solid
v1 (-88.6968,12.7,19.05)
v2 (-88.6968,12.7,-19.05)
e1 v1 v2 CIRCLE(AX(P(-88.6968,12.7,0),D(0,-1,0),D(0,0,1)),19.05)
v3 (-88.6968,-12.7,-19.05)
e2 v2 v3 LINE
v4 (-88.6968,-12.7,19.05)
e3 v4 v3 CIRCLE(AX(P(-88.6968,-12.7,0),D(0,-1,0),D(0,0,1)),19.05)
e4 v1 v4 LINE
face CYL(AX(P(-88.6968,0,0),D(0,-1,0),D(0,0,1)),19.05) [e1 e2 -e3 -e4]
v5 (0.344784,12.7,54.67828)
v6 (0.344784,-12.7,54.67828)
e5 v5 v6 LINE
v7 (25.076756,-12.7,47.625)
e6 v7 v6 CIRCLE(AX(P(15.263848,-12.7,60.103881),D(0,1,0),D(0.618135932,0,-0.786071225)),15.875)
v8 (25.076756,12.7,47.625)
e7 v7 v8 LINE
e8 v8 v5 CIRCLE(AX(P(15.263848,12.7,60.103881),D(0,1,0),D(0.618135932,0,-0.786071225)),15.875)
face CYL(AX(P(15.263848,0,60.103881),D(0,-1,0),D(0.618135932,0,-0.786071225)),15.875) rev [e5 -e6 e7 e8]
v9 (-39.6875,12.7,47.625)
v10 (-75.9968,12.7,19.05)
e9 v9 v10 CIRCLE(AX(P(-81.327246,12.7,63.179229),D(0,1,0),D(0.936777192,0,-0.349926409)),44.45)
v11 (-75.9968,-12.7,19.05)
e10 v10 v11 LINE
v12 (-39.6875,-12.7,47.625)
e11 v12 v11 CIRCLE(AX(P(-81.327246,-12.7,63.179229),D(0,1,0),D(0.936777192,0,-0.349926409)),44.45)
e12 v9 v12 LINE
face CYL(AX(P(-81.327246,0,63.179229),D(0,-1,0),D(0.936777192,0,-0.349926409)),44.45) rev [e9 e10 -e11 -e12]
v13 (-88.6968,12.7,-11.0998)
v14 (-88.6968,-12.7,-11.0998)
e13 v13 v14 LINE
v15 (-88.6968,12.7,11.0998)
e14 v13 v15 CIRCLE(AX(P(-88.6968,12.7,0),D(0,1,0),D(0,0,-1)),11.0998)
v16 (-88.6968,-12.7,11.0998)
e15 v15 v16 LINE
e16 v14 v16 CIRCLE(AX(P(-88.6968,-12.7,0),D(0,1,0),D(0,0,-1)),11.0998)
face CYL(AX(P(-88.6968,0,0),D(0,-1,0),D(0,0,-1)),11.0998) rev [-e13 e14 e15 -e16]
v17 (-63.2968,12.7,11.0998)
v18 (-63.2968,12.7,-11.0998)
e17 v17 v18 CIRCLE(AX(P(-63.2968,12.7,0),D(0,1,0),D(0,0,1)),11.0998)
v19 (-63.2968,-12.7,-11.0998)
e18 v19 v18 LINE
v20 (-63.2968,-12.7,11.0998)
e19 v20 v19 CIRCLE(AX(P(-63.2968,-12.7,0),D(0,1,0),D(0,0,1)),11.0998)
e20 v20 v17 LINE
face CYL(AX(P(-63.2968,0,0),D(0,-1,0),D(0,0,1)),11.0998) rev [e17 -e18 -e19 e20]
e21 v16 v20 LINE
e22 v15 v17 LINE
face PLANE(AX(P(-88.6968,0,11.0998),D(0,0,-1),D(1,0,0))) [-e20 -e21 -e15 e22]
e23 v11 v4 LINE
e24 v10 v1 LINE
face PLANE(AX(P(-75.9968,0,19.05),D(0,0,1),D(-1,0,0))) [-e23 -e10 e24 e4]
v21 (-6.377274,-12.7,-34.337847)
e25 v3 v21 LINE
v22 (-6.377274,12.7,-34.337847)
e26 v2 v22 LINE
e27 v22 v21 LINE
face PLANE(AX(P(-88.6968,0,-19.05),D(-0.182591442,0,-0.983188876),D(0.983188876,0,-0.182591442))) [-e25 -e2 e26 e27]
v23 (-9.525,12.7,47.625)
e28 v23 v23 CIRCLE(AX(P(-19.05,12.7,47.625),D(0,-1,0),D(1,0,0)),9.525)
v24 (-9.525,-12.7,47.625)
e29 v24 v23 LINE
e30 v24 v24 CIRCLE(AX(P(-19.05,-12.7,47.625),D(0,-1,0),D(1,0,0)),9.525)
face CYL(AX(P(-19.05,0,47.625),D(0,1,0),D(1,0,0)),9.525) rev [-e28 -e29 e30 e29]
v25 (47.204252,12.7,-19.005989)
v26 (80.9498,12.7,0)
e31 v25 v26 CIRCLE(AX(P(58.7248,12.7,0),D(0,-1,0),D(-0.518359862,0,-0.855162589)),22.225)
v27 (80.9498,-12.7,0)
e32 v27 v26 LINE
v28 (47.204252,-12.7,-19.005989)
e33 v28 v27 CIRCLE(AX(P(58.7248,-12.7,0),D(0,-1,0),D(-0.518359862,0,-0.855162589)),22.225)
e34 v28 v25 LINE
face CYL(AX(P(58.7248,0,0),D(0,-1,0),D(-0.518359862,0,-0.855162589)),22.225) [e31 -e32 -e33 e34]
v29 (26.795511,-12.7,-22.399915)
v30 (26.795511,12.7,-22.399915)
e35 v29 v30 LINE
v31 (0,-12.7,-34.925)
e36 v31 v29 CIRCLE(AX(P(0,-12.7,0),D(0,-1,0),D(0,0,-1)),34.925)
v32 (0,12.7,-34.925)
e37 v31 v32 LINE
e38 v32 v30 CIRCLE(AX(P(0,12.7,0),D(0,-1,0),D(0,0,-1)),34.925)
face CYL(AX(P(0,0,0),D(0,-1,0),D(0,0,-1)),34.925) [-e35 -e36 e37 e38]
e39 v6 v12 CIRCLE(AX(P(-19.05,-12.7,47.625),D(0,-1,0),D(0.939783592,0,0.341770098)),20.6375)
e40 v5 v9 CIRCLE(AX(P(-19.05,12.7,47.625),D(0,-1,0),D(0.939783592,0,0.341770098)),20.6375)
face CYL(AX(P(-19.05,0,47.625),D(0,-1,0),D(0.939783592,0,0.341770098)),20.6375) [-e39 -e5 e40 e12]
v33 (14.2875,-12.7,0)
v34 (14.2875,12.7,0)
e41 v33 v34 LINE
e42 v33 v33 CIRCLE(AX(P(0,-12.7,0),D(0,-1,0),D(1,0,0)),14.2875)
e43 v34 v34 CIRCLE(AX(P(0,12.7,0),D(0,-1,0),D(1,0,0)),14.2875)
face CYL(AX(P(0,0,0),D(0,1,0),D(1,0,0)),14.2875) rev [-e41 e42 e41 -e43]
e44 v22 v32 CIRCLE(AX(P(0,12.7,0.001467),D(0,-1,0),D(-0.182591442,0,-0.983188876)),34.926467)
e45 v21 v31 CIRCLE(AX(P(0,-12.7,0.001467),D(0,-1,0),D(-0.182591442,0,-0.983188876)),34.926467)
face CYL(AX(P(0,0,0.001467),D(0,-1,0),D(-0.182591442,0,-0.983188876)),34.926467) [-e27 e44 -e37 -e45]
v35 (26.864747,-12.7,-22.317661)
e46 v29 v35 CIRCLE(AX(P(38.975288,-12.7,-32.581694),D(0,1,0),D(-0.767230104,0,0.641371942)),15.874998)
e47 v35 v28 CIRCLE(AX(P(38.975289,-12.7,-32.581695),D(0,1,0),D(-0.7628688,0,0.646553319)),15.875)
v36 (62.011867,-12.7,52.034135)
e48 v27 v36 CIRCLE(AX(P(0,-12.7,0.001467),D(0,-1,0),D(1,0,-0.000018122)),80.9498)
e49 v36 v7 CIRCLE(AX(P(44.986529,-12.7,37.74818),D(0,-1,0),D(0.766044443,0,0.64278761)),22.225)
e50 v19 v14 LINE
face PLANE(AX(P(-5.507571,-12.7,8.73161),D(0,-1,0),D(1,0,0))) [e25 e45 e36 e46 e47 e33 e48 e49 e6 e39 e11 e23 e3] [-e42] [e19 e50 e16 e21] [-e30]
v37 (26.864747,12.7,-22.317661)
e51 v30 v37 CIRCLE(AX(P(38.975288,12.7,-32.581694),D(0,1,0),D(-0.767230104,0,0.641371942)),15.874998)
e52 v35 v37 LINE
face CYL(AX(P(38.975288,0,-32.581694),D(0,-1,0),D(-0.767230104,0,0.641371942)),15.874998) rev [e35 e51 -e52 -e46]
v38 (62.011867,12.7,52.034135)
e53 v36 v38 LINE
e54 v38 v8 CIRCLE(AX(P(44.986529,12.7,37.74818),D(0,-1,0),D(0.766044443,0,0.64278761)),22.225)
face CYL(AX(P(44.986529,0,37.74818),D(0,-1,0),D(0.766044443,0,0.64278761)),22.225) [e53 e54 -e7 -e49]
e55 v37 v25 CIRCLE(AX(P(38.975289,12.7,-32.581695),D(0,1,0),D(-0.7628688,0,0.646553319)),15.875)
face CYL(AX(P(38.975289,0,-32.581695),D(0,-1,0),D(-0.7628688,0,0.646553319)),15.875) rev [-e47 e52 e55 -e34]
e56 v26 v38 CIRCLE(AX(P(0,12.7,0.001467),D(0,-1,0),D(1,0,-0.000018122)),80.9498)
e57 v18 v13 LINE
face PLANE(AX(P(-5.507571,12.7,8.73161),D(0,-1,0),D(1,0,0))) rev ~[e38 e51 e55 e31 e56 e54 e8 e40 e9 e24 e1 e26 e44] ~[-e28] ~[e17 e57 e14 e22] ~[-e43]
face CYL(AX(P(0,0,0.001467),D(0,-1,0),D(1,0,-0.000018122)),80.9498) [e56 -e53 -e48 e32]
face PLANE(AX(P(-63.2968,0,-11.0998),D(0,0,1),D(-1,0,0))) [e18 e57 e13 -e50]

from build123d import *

# Parameters (mm, degrees)
F0_R     = 22.225
F0_R_2   = 14.2875
F0_R_3   = 9.525
F1_DEPTH = 12.7


# Not quite as in the source:
# - the program builds the solid bodies; features that only make, move or delete a surface that nothing else refers to are left out


with BuildPart() as f1:
    # F0 (on Front) → F1 (new body, symmetric)
    with BuildSketch(Plane.XZ):
        with BuildLine():
            ThreePointArc((0.3447838863, 54.6782803896), (1.274446594, 51.2059603319), (1.5875, 47.625))
            ThreePointArc((1.5875, 47.625), (-19.05, 26.9875), (-39.6875, 47.625))
            ThreePointArc((-39.6875, 47.625), (-53.8375681408, 28.2490113175), (-75.9968, 19.05))
            Line((-75.9968, 19.05), (-63.2968, 19.05))
            ThreePointArc((-63.2968, 19.05), (-44.2468, 0), (-63.2968, -19.05))
            Line((-63.2968, -19.05), (-88.6968, -19.05))
            Line((-88.6968, -19.05), (-6.3772739602, -34.3378468245))
            ThreePointArc((-6.3772739602, -34.3378468245), (-3.2021232024, -34.7779019434), (0, -34.925))
            ThreePointArc((0, -34.925), (14.789161423, -31.6391581652), (26.7955113754, -22.3999150697))
            ThreePointArc((26.7955113754, -22.3999150697), (26.830059594, -22.3587292729), (26.8647470812, -22.3176607024))
            ThreePointArc((26.8647470812, -22.3176607024), (36.4241213525, -16.9130263167), (47.2042520761, -19.005988544))
            ThreePointArc((47.2042520761, -19.005988544), (69.6313679155, -19.3648496329), (80.9498, 0))
            ThreePointArc((80.9498, 0), (76.0683727679, 27.6867119276), (62.0118668229, 52.0341345797))
            ThreePointArc((62.0118668229, 52.0341345797), (42.3521205548, 59.8164947236), (25.0767563288, 47.625))
            ThreePointArc((25.0767563288, 47.625), (10.9100684584, 44.8375705557), (0.3447838863, 54.6782803896))
        make_face()
        Circle(F0_R, mode=Mode.SUBTRACT)
        with BuildLine():
            Line((-63.2968, 19.05), (-75.9968, 19.05))
            Line((-75.9968, 19.05), (-88.6968, 19.05))
            ThreePointArc((-88.6968, 19.05), (-107.7468, 0), (-88.6968, -19.05))
            Line((-88.6968, -19.05), (-63.2968, -19.05))
            ThreePointArc((-63.2968, -19.05), (-44.2468, 0), (-63.2968, 19.05))
        make_face()
        with BuildLine():
            ThreePointArc((-88.6968, -11.0998), (-99.7966, 0), (-88.6968, 11.0998))
            Line((-88.6968, 11.0998), (-63.2968, 11.0998))
            ThreePointArc((-63.2968, 11.0998), (-52.197, 0), (-63.2968, -11.0998))
            Line((-63.2968, -11.0998), (-88.6968, -11.0998))
        make_face(mode=Mode.SUBTRACT)
        Circle(F0_R)
        Circle(F0_R_2, mode=Mode.SUBTRACT)
        with BuildLine():
            ThreePointArc((-39.6875, 47.625), (-19.05, 26.9875), (1.5875, 47.625))
            ThreePointArc((1.5875, 47.625), (1.274446594, 51.2059603319), (0.3447838863, 54.6782803896))
            ThreePointArc((0.3447838863, 54.6782803896), (-22.6309603319, 67.949446594), (-39.6875, 47.625))
        make_face()
        with Locations((-19.05, 47.625)):
            Circle(F0_R_3, mode=Mode.SUBTRACT)
    extrude(amount=F1_DEPTH, both=True)


solid = f1.part
